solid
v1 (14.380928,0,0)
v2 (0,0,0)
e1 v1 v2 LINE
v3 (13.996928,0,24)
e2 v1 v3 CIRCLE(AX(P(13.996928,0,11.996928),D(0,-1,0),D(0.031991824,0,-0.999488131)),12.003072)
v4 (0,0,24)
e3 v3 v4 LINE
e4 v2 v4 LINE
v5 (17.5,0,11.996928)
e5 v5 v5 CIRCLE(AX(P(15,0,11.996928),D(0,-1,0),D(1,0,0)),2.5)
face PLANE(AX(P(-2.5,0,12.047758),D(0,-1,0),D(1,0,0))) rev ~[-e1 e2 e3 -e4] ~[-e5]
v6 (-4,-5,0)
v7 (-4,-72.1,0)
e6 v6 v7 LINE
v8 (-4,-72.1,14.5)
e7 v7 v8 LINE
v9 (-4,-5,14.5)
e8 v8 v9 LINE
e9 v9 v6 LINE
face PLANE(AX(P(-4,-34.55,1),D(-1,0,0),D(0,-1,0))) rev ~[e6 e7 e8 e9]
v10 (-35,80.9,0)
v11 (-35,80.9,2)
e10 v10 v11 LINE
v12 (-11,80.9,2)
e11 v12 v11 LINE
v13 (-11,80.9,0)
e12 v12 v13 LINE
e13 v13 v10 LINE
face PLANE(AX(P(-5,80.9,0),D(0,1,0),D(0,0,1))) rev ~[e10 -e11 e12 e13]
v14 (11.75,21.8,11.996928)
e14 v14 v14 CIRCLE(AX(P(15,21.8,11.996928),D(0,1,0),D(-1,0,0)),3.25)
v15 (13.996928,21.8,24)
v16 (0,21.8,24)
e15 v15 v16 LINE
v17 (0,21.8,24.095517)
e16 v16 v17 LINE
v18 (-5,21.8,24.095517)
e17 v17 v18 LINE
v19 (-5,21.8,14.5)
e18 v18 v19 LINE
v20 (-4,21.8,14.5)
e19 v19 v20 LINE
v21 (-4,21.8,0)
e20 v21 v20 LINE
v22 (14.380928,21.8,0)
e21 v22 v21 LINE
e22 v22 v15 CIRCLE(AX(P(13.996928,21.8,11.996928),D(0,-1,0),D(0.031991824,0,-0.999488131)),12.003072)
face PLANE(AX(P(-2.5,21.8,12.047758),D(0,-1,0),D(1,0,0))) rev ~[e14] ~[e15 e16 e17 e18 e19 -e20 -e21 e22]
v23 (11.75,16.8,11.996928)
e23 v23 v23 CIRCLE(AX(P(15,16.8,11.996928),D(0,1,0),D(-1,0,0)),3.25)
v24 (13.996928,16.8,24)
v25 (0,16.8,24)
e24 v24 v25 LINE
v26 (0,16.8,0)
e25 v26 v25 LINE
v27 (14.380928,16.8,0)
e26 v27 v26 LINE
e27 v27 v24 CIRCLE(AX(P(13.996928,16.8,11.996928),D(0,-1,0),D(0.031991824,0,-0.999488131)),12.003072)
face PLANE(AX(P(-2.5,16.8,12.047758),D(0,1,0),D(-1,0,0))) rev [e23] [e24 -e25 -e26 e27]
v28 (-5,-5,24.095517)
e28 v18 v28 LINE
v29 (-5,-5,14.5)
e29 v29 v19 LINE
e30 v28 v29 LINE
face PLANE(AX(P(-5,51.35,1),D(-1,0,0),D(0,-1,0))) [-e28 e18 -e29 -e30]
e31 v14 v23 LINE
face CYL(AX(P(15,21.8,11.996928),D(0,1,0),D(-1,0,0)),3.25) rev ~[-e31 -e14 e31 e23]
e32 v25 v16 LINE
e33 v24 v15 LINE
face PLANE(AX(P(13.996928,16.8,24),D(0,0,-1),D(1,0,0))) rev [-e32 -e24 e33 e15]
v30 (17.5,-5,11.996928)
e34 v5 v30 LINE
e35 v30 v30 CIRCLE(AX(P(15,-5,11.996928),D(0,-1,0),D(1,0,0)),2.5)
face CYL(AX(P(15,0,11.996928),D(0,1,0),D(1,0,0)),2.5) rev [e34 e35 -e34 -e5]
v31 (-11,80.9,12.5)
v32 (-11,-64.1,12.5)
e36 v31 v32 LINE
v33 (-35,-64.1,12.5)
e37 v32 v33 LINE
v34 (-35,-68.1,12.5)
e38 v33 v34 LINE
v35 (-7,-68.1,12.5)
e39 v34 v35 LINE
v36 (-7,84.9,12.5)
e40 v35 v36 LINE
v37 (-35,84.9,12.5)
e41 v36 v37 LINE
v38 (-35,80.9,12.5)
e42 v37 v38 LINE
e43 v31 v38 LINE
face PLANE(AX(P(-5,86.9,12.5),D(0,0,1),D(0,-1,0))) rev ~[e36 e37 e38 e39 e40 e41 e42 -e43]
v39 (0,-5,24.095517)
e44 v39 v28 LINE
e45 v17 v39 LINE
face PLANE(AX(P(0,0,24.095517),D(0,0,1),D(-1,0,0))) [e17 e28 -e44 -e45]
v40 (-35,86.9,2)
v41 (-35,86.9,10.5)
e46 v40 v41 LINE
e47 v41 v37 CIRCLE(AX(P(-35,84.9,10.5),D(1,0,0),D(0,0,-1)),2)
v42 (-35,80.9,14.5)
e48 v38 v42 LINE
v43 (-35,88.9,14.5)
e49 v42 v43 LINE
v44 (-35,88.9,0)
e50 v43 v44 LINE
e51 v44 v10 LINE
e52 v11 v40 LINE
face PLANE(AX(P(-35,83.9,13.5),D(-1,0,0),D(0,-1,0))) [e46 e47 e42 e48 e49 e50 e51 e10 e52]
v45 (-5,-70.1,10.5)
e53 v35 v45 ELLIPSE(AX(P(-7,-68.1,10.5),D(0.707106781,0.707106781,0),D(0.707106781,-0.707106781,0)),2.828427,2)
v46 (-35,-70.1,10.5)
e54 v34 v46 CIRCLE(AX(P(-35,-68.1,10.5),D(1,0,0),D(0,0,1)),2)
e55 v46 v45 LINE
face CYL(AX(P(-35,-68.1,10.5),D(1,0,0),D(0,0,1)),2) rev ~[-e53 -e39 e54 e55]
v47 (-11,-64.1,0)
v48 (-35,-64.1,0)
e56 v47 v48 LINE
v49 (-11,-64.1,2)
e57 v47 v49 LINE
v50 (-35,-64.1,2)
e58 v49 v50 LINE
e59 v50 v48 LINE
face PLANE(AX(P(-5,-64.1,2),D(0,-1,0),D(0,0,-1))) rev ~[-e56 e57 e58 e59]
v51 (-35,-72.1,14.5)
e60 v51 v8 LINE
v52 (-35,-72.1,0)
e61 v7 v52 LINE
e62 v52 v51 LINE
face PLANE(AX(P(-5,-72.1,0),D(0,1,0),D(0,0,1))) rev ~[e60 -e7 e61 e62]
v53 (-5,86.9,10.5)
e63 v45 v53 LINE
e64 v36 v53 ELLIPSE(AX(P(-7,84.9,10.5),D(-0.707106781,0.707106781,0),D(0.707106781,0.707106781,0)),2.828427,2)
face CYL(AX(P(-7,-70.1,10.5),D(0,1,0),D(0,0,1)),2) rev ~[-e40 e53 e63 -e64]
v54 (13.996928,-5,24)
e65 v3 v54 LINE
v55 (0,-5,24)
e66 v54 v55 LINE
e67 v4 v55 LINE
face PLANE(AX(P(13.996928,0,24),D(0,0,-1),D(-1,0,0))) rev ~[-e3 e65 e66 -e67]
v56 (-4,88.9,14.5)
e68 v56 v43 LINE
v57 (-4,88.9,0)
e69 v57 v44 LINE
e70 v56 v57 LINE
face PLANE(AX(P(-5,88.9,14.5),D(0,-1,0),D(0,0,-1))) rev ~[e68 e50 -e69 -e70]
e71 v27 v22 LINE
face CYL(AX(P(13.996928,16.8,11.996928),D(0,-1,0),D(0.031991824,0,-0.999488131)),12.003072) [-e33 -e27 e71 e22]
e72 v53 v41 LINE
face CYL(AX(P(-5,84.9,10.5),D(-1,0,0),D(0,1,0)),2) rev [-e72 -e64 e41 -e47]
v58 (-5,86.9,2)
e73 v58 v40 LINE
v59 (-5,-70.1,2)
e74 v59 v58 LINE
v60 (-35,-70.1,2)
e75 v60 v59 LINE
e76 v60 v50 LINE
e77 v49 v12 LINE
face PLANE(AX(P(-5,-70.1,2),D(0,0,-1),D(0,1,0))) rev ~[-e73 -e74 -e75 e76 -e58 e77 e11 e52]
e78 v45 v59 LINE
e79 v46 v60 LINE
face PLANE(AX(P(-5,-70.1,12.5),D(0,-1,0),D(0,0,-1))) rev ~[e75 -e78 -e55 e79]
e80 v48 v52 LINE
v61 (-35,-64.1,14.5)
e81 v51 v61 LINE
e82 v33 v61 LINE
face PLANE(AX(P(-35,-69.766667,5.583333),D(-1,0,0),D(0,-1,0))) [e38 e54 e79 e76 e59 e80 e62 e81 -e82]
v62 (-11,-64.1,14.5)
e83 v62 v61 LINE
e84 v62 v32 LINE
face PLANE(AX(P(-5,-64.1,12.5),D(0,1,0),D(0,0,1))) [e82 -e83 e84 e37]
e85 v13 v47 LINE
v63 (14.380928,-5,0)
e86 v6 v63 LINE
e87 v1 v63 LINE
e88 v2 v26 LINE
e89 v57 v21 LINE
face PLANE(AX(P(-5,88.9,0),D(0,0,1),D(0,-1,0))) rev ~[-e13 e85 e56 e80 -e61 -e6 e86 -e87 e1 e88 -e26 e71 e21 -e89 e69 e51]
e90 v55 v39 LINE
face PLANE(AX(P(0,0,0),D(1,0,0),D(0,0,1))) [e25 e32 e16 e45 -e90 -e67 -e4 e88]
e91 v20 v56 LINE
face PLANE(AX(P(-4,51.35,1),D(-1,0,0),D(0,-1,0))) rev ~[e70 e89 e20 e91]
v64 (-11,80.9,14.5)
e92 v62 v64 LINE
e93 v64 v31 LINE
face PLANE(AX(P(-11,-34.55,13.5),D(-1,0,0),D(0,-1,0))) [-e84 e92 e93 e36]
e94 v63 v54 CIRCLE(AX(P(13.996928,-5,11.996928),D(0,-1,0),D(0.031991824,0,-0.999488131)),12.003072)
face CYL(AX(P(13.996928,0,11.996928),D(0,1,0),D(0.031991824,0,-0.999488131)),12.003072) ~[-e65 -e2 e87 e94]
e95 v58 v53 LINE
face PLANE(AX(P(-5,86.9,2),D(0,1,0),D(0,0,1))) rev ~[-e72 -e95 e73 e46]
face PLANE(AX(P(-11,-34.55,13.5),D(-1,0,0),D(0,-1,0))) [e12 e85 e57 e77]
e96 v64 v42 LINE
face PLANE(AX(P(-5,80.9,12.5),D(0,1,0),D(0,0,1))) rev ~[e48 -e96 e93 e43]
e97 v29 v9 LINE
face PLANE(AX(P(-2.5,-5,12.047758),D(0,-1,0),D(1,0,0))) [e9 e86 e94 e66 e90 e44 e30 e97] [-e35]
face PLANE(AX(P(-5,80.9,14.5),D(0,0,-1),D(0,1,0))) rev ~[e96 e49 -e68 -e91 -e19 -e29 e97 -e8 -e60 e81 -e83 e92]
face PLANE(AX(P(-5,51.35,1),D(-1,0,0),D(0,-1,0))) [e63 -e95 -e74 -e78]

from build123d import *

# Parameters (mm, degrees)
F0_R          = 3.3
F0_R_2        = 2.5
F1_DEPTH      = 5
F2_DEPTH      = 5
F2_DEPTH_BACK = 21.8
F5_R          = 3.25
F5_R_2        = 2.5
F6_DEPTH      = 6
F7_W          = 59.1
F7_H          = 2
F7_W_2        = 6
F8_DEPTH      = 1
F7_W_3        = 13.4
F9_DEPTH      = 6
F10_DEPTH     = 30
F11_R         = 2


with BuildPart() as f1:
    # F0 (on Front) → F1 (new body)
    with BuildSketch(Plane.XZ):
        with BuildLine():
            Line((13.9969279973, 24), (0, 24))
            Line((0, 24), (0, 0))
            Line((0, 0), (14.3809281676, 0))
            ThreePointArc((14.3809281676, 0), (25.9984639003, 12.1889526569), (13.9969279973, 24))
        make_face()
        with Locations((15, 11.9969279973)):
            Circle(F0_R, mode=Mode.SUBTRACT)
        with Locations((15, 11.9969279973)):
            Circle(F0_R)
        with Locations((15, 11.9969279973)):
            Circle(F0_R_2, mode=Mode.SUBTRACT)
    extrude(amount=F1_DEPTH)

    # F0 (on Front) → F2 (join, two sides)
    with BuildSketch(Plane.XZ) as f2_sk:
        Polygon((0, 0), (0, 24), (0, 24.0955166519), (-5, 24.0955166519), (-5, 0), align=None)
    extrude(amount=F2_DEPTH)
    extrude(f2_sk.sketch, amount=-F2_DEPTH_BACK)

    # F4: F1 across plane


with BuildPart() as f1_1:
    add(f1.part)
    add(f1.part.mirror(Plane.XZ.offset(-8.4)))

    # F5 (on face) → F6 (cut)
    with BuildSketch(Plane(origin=(0, 21.8, 0), x_dir=(-1, 0, 0), z_dir=(0, 1, 0))):
        with Locations((-15, 11.9969279973)):
            Circle(F5_R)
        with Locations((-15, 11.9969279973)):
            Circle(F5_R_2, mode=Mode.SUBTRACT)
    extrude(amount=-F6_DEPTH, mode=Mode.SUBTRACT)

    # F7 (on face) → F8 (join)
    with BuildSketch(Plane(origin=(-5, 0, 0), x_dir=(0, -1, 0), z_dir=(-1, 0, 0))):
        with Locations((-51.35, 1)):
            Rectangle(F7_W, F7_H)
        with Locations((34.55, 1)):
            Rectangle(F7_W, F7_H)
        Polygon((-86.9, 0), (-80.9, 0), (-80.9, 2), (-86.9, 2), (-86.9, 1), align=None)
        Polygon((-80.9, 2), (-21.8, 2), (-21.8, 7.25), (-86.9, 7.25), (-86.9, 2), align=None)
        Polygon((5, 12.5), (5, 2), (64.1, 2), (70.1, 2), (70.1, 7.25), (70.1, 12.5), (64.1, 12.5), align=None)
        Polygon((64.1, 2), (64.1, 0), (70.1, 0), (72.1, 0), (72.1, 7.25), (72.1, 14.5), (70.1, 14.5), (70.1, 12.5), (70.1, 7.25), (70.1, 2), align=None)
        Polygon((-88.9, 0), (-86.9, 0), (-86.9, 1), (-86.9, 2), (-86.9, 7.25), (-88.9, 7.25), align=None)
        Polygon((-86.9, 7.25), (-21.8, 7.25), (-21.8, 12.5), (-80.9, 12.5), (-86.9, 12.5), align=None)
        with Locations((34.55, 13.5)):
            Rectangle(F7_W, F7_H)
        Polygon((-88.9, 7.25), (-86.9, 7.25), (-86.9, 12.5), (-86.9, 14.5), (-88.9, 14.5), align=None)
        with Locations((-51.35, 13.5)):
            Rectangle(F7_W, F7_H)
        with Locations((67.1, 13.5)):
            Rectangle(F7_W_2, F7_H)
        with Locations((-83.9, 13.5)):
            Rectangle(F7_W_2, F7_H)
    extrude(amount=-F8_DEPTH)

    # F7 (on face) → F9 (join)
    with BuildSketch(Plane(origin=(-5, 0, 0), x_dir=(0, -1, 0), z_dir=(-1, 0, 0))):
        with Locations((34.55, 13.5)):
            Rectangle(F7_W, F7_H)
        with Locations((67.1, 13.5)):
            Rectangle(F7_W_2, F7_H)
        Polygon((64.1, 2), (64.1, 0), (70.1, 0), (72.1, 0), (72.1, 7.25), (72.1, 14.5), (70.1, 14.5), (70.1, 12.5), (70.1, 7.25), (70.1, 2), align=None)
        with Locations((34.55, 1)):
            Rectangle(F7_W, F7_H)
        with Locations((-15.1, 1)):
            Rectangle(F7_W_3, F7_H)
        with Locations((-1.7, 1)):
            Rectangle(F7_W_3, F7_H)
        Polygon((-8.4, 12.5), (5, 12.5), (5, 14.5), (-8.4, 14.5), (-21.8, 14.5), (-21.8, 12.5), align=None)
        with Locations((-51.35, 13.5)):
            Rectangle(F7_W, F7_H)
        with Locations((-51.35, 1)):
            Rectangle(F7_W, F7_H)
        with Locations((-83.9, 13.5)):
            Rectangle(F7_W_2, F7_H)
        Polygon((-88.9, 7.25), (-86.9, 7.25), (-86.9, 12.5), (-86.9, 14.5), (-88.9, 14.5), align=None)
        Polygon((-88.9, 0), (-86.9, 0), (-86.9, 1), (-86.9, 2), (-86.9, 7.25), (-88.9, 7.25), align=None)
        Polygon((-86.9, 0), (-80.9, 0), (-80.9, 2), (-86.9, 2), (-86.9, 1), align=None)
    extrude(amount=F9_DEPTH)

    # F7 (on face) → F10 (join)
    with BuildSketch(Plane(origin=(-5, 0, 0), x_dir=(0, -1, 0), z_dir=(-1, 0, 0))):
        with Locations((-83.9, 13.5)):
            Rectangle(F7_W_2, F7_H)
        Polygon((-88.9, 7.25), (-86.9, 7.25), (-86.9, 12.5), (-86.9, 14.5), (-88.9, 14.5), align=None)
        Polygon((-88.9, 0), (-86.9, 0), (-86.9, 1), (-86.9, 2), (-86.9, 7.25), (-88.9, 7.25), align=None)
        Polygon((-86.9, 0), (-80.9, 0), (-80.9, 2), (-86.9, 2), (-86.9, 1), align=None)
        Polygon((64.1, 2), (64.1, 0), (70.1, 0), (72.1, 0), (72.1, 7.25), (72.1, 14.5), (70.1, 14.5), (70.1, 12.5), (70.1, 7.25), (70.1, 2), align=None)
        with Locations((67.1, 13.5)):
            Rectangle(F7_W_2, F7_H)
    extrude(amount=F10_DEPTH)

    # F11
    f11_edges = [f1_1.edges().sort_by_distance(p)[0] for p in [
        (-20, -70.1, 12.5),
        (-5, 8.4, 12.5),
        (-20, 86.9, 12.5),
    ]]
    fillet(f11_edges, radius=F11_R)


solid = f1_1.part
